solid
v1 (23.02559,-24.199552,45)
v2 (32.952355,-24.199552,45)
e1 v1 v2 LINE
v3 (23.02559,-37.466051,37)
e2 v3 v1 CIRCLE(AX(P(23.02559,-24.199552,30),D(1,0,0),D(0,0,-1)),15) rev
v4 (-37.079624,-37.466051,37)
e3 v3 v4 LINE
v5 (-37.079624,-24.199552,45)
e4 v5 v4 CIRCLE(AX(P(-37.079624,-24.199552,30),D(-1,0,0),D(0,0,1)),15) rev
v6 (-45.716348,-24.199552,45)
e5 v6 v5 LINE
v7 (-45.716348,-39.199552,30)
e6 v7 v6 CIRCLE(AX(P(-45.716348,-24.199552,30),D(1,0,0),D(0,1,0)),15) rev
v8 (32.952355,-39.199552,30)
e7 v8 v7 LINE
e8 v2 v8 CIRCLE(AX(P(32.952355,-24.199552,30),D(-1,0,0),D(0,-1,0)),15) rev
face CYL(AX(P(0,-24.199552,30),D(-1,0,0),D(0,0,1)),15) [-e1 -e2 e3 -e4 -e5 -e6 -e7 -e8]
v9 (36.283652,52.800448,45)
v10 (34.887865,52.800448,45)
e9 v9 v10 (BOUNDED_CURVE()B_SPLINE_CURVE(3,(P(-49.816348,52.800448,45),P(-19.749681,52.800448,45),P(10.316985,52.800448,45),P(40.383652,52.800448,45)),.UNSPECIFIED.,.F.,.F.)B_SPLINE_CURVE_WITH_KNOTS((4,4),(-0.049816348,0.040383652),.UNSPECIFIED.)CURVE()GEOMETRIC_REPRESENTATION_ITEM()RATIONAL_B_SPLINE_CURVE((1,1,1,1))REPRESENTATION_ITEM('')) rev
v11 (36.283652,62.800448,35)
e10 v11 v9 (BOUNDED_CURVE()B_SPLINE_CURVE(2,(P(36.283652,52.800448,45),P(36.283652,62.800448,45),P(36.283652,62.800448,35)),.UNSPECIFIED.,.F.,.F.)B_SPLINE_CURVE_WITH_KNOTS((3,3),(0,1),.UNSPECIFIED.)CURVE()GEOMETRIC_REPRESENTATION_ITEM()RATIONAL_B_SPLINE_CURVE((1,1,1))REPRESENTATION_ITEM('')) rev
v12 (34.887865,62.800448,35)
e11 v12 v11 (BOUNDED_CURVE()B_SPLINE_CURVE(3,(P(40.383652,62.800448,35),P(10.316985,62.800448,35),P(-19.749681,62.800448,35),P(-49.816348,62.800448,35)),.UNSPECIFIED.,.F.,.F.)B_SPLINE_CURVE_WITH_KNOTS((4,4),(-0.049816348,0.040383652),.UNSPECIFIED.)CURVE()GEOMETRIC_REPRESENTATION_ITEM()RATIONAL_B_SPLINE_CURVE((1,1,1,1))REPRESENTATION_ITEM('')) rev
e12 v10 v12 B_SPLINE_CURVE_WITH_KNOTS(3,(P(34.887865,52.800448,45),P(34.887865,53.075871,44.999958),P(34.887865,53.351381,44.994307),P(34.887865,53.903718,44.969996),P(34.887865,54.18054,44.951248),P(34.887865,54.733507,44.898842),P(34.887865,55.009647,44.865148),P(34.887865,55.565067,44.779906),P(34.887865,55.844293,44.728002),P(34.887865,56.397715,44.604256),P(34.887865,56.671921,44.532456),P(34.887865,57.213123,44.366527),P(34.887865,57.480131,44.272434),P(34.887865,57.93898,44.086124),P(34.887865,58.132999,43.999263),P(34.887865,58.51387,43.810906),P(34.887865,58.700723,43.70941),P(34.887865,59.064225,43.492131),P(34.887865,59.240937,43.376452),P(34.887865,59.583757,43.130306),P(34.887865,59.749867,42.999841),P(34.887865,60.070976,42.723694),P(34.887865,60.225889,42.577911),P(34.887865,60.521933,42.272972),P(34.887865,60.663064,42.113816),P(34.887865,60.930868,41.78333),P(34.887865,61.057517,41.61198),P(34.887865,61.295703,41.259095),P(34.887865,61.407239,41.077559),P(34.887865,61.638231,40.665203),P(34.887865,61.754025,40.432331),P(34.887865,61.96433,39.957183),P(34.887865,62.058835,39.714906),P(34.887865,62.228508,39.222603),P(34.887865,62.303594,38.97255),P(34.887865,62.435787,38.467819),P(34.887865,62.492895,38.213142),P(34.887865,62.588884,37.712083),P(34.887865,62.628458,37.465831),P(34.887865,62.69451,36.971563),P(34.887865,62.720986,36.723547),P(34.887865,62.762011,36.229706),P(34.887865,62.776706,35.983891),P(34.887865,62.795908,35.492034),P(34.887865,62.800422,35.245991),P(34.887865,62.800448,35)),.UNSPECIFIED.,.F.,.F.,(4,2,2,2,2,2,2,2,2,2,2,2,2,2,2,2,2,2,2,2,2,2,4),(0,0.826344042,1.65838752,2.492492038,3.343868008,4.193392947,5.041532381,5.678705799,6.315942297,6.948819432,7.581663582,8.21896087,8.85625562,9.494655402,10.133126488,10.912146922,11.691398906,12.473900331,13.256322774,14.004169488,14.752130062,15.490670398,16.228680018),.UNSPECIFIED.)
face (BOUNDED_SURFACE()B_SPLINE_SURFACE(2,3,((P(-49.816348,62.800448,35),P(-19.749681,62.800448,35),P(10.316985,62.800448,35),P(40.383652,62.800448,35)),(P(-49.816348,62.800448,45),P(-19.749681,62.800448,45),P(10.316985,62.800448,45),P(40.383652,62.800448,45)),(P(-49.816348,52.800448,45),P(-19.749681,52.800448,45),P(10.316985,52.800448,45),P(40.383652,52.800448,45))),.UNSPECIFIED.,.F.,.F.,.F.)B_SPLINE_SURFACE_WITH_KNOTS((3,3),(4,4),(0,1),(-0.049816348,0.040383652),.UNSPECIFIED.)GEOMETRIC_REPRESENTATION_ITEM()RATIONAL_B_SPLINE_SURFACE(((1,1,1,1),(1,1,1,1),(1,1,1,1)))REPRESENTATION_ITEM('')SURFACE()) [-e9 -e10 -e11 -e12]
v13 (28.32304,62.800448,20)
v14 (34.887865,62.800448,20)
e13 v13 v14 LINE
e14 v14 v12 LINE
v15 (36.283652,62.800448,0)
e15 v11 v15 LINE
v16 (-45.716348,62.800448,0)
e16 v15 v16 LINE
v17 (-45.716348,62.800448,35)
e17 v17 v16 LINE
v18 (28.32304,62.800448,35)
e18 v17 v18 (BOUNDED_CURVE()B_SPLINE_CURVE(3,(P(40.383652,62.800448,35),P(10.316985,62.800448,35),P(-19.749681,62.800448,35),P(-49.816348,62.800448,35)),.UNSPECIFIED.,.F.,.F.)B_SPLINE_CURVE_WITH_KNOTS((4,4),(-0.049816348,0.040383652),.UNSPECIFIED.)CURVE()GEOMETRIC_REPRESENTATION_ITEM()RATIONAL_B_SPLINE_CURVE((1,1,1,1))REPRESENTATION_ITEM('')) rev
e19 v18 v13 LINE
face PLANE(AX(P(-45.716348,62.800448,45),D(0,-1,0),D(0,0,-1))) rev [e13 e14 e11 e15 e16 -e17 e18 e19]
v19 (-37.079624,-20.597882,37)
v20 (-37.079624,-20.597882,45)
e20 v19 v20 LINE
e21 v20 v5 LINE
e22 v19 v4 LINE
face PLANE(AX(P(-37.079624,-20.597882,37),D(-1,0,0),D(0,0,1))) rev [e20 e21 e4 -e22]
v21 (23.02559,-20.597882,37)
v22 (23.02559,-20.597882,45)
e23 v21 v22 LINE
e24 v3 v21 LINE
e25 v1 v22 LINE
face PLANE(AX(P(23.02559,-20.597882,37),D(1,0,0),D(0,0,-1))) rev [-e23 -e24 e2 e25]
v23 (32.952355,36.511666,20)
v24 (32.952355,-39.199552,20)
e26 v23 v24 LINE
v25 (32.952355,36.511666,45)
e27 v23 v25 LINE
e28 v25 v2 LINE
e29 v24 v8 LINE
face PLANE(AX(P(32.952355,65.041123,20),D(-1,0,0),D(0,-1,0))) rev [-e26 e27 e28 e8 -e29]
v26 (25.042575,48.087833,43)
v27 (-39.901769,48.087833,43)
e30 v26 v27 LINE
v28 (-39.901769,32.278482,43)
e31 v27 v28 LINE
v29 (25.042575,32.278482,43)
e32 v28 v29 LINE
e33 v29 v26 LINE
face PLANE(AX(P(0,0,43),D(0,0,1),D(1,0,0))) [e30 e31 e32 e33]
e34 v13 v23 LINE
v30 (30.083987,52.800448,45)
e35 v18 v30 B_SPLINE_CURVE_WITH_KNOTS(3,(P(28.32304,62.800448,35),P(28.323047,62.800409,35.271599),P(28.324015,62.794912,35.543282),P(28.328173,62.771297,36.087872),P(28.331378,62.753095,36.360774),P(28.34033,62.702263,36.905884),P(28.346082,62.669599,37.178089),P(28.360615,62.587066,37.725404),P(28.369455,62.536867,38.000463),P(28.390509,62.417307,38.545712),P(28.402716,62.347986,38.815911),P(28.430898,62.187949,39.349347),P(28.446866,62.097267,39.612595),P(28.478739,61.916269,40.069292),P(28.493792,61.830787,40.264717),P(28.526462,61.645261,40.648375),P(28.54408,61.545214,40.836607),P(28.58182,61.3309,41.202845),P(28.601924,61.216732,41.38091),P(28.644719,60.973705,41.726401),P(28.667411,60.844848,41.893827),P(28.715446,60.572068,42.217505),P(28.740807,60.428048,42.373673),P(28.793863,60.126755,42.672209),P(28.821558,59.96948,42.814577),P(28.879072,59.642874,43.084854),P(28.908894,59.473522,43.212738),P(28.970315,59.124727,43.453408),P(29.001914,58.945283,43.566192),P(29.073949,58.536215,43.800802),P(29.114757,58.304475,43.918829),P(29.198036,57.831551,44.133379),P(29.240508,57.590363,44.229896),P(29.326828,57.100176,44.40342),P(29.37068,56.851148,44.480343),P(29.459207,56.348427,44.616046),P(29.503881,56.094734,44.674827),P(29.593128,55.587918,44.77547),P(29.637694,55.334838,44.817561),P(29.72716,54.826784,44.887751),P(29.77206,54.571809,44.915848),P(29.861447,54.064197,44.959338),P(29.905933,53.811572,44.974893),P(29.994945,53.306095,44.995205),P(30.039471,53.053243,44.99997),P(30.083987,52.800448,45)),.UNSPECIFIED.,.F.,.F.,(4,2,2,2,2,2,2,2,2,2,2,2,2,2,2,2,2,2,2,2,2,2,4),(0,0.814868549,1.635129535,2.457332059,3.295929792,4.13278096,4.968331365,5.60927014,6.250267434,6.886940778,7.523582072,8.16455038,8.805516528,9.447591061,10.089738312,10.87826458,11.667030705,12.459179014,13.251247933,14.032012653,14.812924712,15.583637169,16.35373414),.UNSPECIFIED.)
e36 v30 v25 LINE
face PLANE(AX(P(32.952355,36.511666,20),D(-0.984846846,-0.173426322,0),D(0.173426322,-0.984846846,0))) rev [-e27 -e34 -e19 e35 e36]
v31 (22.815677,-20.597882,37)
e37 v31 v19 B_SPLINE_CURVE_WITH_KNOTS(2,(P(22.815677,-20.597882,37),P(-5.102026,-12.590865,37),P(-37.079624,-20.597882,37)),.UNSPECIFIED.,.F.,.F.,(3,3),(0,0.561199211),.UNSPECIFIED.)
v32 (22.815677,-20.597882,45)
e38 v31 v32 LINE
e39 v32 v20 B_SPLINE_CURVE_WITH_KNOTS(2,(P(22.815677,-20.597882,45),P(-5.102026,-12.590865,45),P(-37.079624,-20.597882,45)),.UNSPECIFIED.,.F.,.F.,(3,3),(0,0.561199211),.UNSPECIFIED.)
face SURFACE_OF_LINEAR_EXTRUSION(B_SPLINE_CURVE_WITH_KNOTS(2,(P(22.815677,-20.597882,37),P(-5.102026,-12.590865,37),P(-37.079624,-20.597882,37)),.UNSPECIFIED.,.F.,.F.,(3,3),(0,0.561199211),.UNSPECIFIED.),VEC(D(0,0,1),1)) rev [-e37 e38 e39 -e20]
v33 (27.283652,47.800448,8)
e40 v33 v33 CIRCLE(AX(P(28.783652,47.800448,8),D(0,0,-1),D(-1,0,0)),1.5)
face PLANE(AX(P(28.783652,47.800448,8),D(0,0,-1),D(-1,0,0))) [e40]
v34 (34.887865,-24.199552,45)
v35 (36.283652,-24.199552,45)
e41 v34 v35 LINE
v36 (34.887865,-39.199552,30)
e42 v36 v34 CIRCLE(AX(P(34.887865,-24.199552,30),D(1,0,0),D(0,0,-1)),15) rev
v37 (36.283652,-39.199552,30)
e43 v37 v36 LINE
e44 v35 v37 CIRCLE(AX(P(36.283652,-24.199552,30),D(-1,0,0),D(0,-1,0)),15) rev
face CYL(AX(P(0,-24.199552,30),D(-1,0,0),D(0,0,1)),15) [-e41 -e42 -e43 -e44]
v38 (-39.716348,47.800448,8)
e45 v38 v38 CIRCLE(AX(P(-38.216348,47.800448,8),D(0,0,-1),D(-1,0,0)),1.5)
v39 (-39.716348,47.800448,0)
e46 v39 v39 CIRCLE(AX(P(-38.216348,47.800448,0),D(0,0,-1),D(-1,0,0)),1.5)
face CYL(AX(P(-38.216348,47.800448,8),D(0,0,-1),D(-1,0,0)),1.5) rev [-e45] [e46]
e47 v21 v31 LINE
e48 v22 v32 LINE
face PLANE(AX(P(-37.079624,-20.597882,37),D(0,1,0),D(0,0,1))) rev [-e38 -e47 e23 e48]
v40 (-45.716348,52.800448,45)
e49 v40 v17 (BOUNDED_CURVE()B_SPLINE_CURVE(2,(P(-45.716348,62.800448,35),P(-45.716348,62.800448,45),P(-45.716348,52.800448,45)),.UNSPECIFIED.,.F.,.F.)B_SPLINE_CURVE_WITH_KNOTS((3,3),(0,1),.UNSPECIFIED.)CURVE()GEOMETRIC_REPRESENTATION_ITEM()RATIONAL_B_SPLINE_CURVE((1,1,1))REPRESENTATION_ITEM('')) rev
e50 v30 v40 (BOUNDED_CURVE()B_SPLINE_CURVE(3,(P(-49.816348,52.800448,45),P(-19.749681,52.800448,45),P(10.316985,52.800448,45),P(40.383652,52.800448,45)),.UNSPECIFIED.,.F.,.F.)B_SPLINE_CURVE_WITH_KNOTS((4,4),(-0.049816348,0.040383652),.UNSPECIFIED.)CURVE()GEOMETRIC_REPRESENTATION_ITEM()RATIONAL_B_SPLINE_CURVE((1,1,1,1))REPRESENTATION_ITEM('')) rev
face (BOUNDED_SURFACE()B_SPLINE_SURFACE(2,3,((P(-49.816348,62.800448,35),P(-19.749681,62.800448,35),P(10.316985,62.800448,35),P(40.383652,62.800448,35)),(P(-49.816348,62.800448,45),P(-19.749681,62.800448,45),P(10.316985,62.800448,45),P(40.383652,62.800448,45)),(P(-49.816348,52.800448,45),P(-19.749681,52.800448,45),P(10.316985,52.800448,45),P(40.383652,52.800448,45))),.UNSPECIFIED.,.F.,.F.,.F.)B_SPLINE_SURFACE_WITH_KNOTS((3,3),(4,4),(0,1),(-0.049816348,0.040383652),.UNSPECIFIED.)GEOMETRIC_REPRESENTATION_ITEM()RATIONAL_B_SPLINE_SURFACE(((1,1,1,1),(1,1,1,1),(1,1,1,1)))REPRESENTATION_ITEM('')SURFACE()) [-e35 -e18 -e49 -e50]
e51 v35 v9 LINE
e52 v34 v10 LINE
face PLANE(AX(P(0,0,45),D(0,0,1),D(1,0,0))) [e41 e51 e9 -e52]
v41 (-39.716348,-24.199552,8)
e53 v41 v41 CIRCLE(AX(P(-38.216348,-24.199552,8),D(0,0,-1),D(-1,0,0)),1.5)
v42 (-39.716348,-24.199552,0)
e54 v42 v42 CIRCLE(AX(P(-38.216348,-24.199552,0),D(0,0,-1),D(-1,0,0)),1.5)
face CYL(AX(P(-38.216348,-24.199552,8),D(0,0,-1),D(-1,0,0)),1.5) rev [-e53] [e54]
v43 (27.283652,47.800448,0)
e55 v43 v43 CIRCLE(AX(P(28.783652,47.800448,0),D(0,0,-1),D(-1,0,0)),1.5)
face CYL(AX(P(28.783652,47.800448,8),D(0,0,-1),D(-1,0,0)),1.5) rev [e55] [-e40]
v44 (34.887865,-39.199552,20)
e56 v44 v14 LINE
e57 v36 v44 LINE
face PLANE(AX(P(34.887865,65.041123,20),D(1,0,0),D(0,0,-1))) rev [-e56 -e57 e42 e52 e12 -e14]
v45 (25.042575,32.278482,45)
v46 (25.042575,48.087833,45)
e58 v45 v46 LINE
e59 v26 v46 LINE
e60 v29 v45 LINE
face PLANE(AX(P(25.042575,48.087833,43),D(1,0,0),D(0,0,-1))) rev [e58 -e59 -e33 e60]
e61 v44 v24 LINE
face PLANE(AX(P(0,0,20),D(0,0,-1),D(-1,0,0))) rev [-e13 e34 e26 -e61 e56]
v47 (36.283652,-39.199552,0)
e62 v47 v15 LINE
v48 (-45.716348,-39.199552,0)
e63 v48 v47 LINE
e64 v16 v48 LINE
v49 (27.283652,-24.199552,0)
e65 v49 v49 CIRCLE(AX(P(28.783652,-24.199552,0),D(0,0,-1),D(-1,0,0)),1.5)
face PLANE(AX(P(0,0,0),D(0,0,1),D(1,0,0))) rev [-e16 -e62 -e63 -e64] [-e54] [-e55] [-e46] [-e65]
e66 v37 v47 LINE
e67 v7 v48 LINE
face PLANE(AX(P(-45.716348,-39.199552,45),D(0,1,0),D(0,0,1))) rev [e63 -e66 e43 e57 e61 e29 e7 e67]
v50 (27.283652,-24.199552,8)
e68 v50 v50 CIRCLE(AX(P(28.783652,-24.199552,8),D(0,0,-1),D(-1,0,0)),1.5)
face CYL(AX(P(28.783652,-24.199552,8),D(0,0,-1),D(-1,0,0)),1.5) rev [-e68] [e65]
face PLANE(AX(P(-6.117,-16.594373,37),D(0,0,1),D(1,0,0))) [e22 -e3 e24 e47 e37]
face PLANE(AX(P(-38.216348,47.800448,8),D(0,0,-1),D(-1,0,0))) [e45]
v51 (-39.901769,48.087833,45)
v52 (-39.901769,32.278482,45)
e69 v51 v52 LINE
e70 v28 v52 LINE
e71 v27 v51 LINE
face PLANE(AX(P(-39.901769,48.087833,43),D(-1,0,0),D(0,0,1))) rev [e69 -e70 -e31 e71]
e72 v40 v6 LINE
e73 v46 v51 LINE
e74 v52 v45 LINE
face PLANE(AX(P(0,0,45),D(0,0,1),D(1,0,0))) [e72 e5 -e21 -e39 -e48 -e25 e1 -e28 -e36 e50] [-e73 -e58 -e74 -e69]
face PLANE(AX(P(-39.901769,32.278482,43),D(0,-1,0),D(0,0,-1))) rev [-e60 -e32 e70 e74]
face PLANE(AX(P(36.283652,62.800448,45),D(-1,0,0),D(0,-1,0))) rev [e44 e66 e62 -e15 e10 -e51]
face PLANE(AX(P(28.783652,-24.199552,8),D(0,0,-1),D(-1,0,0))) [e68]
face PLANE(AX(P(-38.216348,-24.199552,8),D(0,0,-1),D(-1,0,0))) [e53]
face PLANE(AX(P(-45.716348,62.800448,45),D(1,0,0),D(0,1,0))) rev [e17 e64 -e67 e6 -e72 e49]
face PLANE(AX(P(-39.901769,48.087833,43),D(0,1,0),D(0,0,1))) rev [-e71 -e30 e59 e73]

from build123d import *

# Parameters (mm, degrees)
SKETCH1_W           = 82
SKETCH1_H           = 102
BOSS_EXTRUDE1_DEPTH = 45
FILLET1_R           = 15
FILLET2_SIZE        = 10
SKETCH2_W           = 1.935509438
SKETCH2_H           = 108.039568053
CUT_EXTRUDE1_DEPTH  = 25
CUT_EXTRUDE2_DEPTH  = 25
SKETCH4_W           = 64.944344057
SKETCH4_H           = 15.809351463
CUT_EXTRUDE3_DEPTH  = 2
CUT_EXTRUDE4_DEPTH  = 8
SKETCH6_W           = 60.105213435
SKETCH6_H           = 24.98512856
CUT_EXTRUDE5_DEPTH  = 8
SKETCH7_R           = 1.5
CUT_EXTRUDE6_DEPTH  = 8


with BuildPart() as part:
    # Sketch1 → Boss-Extrude1 (new body)
    with BuildSketch(Plane.XY):
        with Locations((-4.71634799, 11.800448269)):
            Rectangle(SKETCH1_W, SKETCH1_H)
    extrude(amount=BOSS_EXTRUDE1_DEPTH)

    # Fillet1
    fillet1_edges = [part.edges().sort_by_distance(p)[0] for p in [
        (-4.71634799, -39.199551731, 45),
    ]]
    fillet(fillet1_edges, radius=FILLET1_R)

    # Fillet2
    # a fillet whose section is not a circle: 10 mm, written as the material it takes off along each edge
    with BuildSketch(Plane(origin=(-70.71634799, 62.800448269, 45), x_dir=(0, -1, 0), z_dir=(1, 0, 0))) as fillet2_piece_1:
        with BuildLine():
            Bezier((FILLET2_SIZE, 0), (0, 0), (0, FILLET2_SIZE), weights=[1, 1, 1])
            Line((0, FILLET2_SIZE), (0, 0))
            Line((0, 0), (FILLET2_SIZE, 0))
        make_face()
    extrude(amount=132, mode=Mode.SUBTRACT)

    # Sketch2 → Cut-Extrude1 (cut)
    with BuildSketch(Plane.XY.offset(45)):
        with Locations((33.920109965, 11.021338758)):
            Rectangle(SKETCH2_W, SKETCH2_H)
    extrude(amount=-CUT_EXTRUDE1_DEPTH, mode=Mode.SUBTRACT)

    # Sketch3 → Cut-Extrude2 (cut)
    with BuildSketch(Plane.XY.offset(45)):
        Polygon((32.952355246, 36.51166629), (28.204087152, 63.475951779), (32.952355246, 63.475951779), align=None)
    extrude(amount=-CUT_EXTRUDE2_DEPTH, mode=Mode.SUBTRACT)

    # Sketch4 → Cut-Extrude3 (cut)
    with BuildSketch(Plane.XY.offset(45)):
        with Locations((-7.429597209, 40.183157287)):
            Rectangle(SKETCH4_W, SKETCH4_H)
    extrude(amount=-CUT_EXTRUDE3_DEPTH, mode=Mode.SUBTRACT)

    # Sketch5 → Cut-Extrude4 (cut)
    with BuildSketch(Plane.XY.offset(45)):
        with BuildLine():
            Line((-37.079623524, -20.597881777), (22.815677351, -20.597881777))
            add(Edge.make_bspline(
                [(-37.079623524, -20.597881777), (-5.102026038, -12.590864718), (22.815677351, -20.597881777)],
                knots=[0, 0, 0, 0.561199211, 0.561199211, 0.561199211], degree=2))
        make_face()
    extrude(amount=-CUT_EXTRUDE4_DEPTH, mode=Mode.SUBTRACT)

    # Sketch6 → Cut-Extrude5 (cut)
    with BuildSketch(Plane.XY.offset(45)):
        with Locations((-7.027016807, -33.090446057)):
            Rectangle(SKETCH6_W, SKETCH6_H)
    extrude(amount=-CUT_EXTRUDE5_DEPTH, mode=Mode.SUBTRACT)

    # Sketch7 → Cut-Extrude6 (cut)
    with BuildSketch(Plane(origin=(0, 0, 0), x_dir=(-1, 0, 0), z_dir=(0, 0, -1))):
        with Locations((-28.78365201, 47.800448269)):
            Circle(SKETCH7_R)
        with Locations((38.21634799, 47.800448269)):
            Circle(SKETCH7_R)
        with Locations((38.21634799, -24.199551731)):
            Circle(SKETCH7_R)
        with Locations((-28.78365201, -24.199551731)):
            Circle(SKETCH7_R)
    extrude(amount=-CUT_EXTRUDE6_DEPTH, mode=Mode.SUBTRACT)


solid = part.part
